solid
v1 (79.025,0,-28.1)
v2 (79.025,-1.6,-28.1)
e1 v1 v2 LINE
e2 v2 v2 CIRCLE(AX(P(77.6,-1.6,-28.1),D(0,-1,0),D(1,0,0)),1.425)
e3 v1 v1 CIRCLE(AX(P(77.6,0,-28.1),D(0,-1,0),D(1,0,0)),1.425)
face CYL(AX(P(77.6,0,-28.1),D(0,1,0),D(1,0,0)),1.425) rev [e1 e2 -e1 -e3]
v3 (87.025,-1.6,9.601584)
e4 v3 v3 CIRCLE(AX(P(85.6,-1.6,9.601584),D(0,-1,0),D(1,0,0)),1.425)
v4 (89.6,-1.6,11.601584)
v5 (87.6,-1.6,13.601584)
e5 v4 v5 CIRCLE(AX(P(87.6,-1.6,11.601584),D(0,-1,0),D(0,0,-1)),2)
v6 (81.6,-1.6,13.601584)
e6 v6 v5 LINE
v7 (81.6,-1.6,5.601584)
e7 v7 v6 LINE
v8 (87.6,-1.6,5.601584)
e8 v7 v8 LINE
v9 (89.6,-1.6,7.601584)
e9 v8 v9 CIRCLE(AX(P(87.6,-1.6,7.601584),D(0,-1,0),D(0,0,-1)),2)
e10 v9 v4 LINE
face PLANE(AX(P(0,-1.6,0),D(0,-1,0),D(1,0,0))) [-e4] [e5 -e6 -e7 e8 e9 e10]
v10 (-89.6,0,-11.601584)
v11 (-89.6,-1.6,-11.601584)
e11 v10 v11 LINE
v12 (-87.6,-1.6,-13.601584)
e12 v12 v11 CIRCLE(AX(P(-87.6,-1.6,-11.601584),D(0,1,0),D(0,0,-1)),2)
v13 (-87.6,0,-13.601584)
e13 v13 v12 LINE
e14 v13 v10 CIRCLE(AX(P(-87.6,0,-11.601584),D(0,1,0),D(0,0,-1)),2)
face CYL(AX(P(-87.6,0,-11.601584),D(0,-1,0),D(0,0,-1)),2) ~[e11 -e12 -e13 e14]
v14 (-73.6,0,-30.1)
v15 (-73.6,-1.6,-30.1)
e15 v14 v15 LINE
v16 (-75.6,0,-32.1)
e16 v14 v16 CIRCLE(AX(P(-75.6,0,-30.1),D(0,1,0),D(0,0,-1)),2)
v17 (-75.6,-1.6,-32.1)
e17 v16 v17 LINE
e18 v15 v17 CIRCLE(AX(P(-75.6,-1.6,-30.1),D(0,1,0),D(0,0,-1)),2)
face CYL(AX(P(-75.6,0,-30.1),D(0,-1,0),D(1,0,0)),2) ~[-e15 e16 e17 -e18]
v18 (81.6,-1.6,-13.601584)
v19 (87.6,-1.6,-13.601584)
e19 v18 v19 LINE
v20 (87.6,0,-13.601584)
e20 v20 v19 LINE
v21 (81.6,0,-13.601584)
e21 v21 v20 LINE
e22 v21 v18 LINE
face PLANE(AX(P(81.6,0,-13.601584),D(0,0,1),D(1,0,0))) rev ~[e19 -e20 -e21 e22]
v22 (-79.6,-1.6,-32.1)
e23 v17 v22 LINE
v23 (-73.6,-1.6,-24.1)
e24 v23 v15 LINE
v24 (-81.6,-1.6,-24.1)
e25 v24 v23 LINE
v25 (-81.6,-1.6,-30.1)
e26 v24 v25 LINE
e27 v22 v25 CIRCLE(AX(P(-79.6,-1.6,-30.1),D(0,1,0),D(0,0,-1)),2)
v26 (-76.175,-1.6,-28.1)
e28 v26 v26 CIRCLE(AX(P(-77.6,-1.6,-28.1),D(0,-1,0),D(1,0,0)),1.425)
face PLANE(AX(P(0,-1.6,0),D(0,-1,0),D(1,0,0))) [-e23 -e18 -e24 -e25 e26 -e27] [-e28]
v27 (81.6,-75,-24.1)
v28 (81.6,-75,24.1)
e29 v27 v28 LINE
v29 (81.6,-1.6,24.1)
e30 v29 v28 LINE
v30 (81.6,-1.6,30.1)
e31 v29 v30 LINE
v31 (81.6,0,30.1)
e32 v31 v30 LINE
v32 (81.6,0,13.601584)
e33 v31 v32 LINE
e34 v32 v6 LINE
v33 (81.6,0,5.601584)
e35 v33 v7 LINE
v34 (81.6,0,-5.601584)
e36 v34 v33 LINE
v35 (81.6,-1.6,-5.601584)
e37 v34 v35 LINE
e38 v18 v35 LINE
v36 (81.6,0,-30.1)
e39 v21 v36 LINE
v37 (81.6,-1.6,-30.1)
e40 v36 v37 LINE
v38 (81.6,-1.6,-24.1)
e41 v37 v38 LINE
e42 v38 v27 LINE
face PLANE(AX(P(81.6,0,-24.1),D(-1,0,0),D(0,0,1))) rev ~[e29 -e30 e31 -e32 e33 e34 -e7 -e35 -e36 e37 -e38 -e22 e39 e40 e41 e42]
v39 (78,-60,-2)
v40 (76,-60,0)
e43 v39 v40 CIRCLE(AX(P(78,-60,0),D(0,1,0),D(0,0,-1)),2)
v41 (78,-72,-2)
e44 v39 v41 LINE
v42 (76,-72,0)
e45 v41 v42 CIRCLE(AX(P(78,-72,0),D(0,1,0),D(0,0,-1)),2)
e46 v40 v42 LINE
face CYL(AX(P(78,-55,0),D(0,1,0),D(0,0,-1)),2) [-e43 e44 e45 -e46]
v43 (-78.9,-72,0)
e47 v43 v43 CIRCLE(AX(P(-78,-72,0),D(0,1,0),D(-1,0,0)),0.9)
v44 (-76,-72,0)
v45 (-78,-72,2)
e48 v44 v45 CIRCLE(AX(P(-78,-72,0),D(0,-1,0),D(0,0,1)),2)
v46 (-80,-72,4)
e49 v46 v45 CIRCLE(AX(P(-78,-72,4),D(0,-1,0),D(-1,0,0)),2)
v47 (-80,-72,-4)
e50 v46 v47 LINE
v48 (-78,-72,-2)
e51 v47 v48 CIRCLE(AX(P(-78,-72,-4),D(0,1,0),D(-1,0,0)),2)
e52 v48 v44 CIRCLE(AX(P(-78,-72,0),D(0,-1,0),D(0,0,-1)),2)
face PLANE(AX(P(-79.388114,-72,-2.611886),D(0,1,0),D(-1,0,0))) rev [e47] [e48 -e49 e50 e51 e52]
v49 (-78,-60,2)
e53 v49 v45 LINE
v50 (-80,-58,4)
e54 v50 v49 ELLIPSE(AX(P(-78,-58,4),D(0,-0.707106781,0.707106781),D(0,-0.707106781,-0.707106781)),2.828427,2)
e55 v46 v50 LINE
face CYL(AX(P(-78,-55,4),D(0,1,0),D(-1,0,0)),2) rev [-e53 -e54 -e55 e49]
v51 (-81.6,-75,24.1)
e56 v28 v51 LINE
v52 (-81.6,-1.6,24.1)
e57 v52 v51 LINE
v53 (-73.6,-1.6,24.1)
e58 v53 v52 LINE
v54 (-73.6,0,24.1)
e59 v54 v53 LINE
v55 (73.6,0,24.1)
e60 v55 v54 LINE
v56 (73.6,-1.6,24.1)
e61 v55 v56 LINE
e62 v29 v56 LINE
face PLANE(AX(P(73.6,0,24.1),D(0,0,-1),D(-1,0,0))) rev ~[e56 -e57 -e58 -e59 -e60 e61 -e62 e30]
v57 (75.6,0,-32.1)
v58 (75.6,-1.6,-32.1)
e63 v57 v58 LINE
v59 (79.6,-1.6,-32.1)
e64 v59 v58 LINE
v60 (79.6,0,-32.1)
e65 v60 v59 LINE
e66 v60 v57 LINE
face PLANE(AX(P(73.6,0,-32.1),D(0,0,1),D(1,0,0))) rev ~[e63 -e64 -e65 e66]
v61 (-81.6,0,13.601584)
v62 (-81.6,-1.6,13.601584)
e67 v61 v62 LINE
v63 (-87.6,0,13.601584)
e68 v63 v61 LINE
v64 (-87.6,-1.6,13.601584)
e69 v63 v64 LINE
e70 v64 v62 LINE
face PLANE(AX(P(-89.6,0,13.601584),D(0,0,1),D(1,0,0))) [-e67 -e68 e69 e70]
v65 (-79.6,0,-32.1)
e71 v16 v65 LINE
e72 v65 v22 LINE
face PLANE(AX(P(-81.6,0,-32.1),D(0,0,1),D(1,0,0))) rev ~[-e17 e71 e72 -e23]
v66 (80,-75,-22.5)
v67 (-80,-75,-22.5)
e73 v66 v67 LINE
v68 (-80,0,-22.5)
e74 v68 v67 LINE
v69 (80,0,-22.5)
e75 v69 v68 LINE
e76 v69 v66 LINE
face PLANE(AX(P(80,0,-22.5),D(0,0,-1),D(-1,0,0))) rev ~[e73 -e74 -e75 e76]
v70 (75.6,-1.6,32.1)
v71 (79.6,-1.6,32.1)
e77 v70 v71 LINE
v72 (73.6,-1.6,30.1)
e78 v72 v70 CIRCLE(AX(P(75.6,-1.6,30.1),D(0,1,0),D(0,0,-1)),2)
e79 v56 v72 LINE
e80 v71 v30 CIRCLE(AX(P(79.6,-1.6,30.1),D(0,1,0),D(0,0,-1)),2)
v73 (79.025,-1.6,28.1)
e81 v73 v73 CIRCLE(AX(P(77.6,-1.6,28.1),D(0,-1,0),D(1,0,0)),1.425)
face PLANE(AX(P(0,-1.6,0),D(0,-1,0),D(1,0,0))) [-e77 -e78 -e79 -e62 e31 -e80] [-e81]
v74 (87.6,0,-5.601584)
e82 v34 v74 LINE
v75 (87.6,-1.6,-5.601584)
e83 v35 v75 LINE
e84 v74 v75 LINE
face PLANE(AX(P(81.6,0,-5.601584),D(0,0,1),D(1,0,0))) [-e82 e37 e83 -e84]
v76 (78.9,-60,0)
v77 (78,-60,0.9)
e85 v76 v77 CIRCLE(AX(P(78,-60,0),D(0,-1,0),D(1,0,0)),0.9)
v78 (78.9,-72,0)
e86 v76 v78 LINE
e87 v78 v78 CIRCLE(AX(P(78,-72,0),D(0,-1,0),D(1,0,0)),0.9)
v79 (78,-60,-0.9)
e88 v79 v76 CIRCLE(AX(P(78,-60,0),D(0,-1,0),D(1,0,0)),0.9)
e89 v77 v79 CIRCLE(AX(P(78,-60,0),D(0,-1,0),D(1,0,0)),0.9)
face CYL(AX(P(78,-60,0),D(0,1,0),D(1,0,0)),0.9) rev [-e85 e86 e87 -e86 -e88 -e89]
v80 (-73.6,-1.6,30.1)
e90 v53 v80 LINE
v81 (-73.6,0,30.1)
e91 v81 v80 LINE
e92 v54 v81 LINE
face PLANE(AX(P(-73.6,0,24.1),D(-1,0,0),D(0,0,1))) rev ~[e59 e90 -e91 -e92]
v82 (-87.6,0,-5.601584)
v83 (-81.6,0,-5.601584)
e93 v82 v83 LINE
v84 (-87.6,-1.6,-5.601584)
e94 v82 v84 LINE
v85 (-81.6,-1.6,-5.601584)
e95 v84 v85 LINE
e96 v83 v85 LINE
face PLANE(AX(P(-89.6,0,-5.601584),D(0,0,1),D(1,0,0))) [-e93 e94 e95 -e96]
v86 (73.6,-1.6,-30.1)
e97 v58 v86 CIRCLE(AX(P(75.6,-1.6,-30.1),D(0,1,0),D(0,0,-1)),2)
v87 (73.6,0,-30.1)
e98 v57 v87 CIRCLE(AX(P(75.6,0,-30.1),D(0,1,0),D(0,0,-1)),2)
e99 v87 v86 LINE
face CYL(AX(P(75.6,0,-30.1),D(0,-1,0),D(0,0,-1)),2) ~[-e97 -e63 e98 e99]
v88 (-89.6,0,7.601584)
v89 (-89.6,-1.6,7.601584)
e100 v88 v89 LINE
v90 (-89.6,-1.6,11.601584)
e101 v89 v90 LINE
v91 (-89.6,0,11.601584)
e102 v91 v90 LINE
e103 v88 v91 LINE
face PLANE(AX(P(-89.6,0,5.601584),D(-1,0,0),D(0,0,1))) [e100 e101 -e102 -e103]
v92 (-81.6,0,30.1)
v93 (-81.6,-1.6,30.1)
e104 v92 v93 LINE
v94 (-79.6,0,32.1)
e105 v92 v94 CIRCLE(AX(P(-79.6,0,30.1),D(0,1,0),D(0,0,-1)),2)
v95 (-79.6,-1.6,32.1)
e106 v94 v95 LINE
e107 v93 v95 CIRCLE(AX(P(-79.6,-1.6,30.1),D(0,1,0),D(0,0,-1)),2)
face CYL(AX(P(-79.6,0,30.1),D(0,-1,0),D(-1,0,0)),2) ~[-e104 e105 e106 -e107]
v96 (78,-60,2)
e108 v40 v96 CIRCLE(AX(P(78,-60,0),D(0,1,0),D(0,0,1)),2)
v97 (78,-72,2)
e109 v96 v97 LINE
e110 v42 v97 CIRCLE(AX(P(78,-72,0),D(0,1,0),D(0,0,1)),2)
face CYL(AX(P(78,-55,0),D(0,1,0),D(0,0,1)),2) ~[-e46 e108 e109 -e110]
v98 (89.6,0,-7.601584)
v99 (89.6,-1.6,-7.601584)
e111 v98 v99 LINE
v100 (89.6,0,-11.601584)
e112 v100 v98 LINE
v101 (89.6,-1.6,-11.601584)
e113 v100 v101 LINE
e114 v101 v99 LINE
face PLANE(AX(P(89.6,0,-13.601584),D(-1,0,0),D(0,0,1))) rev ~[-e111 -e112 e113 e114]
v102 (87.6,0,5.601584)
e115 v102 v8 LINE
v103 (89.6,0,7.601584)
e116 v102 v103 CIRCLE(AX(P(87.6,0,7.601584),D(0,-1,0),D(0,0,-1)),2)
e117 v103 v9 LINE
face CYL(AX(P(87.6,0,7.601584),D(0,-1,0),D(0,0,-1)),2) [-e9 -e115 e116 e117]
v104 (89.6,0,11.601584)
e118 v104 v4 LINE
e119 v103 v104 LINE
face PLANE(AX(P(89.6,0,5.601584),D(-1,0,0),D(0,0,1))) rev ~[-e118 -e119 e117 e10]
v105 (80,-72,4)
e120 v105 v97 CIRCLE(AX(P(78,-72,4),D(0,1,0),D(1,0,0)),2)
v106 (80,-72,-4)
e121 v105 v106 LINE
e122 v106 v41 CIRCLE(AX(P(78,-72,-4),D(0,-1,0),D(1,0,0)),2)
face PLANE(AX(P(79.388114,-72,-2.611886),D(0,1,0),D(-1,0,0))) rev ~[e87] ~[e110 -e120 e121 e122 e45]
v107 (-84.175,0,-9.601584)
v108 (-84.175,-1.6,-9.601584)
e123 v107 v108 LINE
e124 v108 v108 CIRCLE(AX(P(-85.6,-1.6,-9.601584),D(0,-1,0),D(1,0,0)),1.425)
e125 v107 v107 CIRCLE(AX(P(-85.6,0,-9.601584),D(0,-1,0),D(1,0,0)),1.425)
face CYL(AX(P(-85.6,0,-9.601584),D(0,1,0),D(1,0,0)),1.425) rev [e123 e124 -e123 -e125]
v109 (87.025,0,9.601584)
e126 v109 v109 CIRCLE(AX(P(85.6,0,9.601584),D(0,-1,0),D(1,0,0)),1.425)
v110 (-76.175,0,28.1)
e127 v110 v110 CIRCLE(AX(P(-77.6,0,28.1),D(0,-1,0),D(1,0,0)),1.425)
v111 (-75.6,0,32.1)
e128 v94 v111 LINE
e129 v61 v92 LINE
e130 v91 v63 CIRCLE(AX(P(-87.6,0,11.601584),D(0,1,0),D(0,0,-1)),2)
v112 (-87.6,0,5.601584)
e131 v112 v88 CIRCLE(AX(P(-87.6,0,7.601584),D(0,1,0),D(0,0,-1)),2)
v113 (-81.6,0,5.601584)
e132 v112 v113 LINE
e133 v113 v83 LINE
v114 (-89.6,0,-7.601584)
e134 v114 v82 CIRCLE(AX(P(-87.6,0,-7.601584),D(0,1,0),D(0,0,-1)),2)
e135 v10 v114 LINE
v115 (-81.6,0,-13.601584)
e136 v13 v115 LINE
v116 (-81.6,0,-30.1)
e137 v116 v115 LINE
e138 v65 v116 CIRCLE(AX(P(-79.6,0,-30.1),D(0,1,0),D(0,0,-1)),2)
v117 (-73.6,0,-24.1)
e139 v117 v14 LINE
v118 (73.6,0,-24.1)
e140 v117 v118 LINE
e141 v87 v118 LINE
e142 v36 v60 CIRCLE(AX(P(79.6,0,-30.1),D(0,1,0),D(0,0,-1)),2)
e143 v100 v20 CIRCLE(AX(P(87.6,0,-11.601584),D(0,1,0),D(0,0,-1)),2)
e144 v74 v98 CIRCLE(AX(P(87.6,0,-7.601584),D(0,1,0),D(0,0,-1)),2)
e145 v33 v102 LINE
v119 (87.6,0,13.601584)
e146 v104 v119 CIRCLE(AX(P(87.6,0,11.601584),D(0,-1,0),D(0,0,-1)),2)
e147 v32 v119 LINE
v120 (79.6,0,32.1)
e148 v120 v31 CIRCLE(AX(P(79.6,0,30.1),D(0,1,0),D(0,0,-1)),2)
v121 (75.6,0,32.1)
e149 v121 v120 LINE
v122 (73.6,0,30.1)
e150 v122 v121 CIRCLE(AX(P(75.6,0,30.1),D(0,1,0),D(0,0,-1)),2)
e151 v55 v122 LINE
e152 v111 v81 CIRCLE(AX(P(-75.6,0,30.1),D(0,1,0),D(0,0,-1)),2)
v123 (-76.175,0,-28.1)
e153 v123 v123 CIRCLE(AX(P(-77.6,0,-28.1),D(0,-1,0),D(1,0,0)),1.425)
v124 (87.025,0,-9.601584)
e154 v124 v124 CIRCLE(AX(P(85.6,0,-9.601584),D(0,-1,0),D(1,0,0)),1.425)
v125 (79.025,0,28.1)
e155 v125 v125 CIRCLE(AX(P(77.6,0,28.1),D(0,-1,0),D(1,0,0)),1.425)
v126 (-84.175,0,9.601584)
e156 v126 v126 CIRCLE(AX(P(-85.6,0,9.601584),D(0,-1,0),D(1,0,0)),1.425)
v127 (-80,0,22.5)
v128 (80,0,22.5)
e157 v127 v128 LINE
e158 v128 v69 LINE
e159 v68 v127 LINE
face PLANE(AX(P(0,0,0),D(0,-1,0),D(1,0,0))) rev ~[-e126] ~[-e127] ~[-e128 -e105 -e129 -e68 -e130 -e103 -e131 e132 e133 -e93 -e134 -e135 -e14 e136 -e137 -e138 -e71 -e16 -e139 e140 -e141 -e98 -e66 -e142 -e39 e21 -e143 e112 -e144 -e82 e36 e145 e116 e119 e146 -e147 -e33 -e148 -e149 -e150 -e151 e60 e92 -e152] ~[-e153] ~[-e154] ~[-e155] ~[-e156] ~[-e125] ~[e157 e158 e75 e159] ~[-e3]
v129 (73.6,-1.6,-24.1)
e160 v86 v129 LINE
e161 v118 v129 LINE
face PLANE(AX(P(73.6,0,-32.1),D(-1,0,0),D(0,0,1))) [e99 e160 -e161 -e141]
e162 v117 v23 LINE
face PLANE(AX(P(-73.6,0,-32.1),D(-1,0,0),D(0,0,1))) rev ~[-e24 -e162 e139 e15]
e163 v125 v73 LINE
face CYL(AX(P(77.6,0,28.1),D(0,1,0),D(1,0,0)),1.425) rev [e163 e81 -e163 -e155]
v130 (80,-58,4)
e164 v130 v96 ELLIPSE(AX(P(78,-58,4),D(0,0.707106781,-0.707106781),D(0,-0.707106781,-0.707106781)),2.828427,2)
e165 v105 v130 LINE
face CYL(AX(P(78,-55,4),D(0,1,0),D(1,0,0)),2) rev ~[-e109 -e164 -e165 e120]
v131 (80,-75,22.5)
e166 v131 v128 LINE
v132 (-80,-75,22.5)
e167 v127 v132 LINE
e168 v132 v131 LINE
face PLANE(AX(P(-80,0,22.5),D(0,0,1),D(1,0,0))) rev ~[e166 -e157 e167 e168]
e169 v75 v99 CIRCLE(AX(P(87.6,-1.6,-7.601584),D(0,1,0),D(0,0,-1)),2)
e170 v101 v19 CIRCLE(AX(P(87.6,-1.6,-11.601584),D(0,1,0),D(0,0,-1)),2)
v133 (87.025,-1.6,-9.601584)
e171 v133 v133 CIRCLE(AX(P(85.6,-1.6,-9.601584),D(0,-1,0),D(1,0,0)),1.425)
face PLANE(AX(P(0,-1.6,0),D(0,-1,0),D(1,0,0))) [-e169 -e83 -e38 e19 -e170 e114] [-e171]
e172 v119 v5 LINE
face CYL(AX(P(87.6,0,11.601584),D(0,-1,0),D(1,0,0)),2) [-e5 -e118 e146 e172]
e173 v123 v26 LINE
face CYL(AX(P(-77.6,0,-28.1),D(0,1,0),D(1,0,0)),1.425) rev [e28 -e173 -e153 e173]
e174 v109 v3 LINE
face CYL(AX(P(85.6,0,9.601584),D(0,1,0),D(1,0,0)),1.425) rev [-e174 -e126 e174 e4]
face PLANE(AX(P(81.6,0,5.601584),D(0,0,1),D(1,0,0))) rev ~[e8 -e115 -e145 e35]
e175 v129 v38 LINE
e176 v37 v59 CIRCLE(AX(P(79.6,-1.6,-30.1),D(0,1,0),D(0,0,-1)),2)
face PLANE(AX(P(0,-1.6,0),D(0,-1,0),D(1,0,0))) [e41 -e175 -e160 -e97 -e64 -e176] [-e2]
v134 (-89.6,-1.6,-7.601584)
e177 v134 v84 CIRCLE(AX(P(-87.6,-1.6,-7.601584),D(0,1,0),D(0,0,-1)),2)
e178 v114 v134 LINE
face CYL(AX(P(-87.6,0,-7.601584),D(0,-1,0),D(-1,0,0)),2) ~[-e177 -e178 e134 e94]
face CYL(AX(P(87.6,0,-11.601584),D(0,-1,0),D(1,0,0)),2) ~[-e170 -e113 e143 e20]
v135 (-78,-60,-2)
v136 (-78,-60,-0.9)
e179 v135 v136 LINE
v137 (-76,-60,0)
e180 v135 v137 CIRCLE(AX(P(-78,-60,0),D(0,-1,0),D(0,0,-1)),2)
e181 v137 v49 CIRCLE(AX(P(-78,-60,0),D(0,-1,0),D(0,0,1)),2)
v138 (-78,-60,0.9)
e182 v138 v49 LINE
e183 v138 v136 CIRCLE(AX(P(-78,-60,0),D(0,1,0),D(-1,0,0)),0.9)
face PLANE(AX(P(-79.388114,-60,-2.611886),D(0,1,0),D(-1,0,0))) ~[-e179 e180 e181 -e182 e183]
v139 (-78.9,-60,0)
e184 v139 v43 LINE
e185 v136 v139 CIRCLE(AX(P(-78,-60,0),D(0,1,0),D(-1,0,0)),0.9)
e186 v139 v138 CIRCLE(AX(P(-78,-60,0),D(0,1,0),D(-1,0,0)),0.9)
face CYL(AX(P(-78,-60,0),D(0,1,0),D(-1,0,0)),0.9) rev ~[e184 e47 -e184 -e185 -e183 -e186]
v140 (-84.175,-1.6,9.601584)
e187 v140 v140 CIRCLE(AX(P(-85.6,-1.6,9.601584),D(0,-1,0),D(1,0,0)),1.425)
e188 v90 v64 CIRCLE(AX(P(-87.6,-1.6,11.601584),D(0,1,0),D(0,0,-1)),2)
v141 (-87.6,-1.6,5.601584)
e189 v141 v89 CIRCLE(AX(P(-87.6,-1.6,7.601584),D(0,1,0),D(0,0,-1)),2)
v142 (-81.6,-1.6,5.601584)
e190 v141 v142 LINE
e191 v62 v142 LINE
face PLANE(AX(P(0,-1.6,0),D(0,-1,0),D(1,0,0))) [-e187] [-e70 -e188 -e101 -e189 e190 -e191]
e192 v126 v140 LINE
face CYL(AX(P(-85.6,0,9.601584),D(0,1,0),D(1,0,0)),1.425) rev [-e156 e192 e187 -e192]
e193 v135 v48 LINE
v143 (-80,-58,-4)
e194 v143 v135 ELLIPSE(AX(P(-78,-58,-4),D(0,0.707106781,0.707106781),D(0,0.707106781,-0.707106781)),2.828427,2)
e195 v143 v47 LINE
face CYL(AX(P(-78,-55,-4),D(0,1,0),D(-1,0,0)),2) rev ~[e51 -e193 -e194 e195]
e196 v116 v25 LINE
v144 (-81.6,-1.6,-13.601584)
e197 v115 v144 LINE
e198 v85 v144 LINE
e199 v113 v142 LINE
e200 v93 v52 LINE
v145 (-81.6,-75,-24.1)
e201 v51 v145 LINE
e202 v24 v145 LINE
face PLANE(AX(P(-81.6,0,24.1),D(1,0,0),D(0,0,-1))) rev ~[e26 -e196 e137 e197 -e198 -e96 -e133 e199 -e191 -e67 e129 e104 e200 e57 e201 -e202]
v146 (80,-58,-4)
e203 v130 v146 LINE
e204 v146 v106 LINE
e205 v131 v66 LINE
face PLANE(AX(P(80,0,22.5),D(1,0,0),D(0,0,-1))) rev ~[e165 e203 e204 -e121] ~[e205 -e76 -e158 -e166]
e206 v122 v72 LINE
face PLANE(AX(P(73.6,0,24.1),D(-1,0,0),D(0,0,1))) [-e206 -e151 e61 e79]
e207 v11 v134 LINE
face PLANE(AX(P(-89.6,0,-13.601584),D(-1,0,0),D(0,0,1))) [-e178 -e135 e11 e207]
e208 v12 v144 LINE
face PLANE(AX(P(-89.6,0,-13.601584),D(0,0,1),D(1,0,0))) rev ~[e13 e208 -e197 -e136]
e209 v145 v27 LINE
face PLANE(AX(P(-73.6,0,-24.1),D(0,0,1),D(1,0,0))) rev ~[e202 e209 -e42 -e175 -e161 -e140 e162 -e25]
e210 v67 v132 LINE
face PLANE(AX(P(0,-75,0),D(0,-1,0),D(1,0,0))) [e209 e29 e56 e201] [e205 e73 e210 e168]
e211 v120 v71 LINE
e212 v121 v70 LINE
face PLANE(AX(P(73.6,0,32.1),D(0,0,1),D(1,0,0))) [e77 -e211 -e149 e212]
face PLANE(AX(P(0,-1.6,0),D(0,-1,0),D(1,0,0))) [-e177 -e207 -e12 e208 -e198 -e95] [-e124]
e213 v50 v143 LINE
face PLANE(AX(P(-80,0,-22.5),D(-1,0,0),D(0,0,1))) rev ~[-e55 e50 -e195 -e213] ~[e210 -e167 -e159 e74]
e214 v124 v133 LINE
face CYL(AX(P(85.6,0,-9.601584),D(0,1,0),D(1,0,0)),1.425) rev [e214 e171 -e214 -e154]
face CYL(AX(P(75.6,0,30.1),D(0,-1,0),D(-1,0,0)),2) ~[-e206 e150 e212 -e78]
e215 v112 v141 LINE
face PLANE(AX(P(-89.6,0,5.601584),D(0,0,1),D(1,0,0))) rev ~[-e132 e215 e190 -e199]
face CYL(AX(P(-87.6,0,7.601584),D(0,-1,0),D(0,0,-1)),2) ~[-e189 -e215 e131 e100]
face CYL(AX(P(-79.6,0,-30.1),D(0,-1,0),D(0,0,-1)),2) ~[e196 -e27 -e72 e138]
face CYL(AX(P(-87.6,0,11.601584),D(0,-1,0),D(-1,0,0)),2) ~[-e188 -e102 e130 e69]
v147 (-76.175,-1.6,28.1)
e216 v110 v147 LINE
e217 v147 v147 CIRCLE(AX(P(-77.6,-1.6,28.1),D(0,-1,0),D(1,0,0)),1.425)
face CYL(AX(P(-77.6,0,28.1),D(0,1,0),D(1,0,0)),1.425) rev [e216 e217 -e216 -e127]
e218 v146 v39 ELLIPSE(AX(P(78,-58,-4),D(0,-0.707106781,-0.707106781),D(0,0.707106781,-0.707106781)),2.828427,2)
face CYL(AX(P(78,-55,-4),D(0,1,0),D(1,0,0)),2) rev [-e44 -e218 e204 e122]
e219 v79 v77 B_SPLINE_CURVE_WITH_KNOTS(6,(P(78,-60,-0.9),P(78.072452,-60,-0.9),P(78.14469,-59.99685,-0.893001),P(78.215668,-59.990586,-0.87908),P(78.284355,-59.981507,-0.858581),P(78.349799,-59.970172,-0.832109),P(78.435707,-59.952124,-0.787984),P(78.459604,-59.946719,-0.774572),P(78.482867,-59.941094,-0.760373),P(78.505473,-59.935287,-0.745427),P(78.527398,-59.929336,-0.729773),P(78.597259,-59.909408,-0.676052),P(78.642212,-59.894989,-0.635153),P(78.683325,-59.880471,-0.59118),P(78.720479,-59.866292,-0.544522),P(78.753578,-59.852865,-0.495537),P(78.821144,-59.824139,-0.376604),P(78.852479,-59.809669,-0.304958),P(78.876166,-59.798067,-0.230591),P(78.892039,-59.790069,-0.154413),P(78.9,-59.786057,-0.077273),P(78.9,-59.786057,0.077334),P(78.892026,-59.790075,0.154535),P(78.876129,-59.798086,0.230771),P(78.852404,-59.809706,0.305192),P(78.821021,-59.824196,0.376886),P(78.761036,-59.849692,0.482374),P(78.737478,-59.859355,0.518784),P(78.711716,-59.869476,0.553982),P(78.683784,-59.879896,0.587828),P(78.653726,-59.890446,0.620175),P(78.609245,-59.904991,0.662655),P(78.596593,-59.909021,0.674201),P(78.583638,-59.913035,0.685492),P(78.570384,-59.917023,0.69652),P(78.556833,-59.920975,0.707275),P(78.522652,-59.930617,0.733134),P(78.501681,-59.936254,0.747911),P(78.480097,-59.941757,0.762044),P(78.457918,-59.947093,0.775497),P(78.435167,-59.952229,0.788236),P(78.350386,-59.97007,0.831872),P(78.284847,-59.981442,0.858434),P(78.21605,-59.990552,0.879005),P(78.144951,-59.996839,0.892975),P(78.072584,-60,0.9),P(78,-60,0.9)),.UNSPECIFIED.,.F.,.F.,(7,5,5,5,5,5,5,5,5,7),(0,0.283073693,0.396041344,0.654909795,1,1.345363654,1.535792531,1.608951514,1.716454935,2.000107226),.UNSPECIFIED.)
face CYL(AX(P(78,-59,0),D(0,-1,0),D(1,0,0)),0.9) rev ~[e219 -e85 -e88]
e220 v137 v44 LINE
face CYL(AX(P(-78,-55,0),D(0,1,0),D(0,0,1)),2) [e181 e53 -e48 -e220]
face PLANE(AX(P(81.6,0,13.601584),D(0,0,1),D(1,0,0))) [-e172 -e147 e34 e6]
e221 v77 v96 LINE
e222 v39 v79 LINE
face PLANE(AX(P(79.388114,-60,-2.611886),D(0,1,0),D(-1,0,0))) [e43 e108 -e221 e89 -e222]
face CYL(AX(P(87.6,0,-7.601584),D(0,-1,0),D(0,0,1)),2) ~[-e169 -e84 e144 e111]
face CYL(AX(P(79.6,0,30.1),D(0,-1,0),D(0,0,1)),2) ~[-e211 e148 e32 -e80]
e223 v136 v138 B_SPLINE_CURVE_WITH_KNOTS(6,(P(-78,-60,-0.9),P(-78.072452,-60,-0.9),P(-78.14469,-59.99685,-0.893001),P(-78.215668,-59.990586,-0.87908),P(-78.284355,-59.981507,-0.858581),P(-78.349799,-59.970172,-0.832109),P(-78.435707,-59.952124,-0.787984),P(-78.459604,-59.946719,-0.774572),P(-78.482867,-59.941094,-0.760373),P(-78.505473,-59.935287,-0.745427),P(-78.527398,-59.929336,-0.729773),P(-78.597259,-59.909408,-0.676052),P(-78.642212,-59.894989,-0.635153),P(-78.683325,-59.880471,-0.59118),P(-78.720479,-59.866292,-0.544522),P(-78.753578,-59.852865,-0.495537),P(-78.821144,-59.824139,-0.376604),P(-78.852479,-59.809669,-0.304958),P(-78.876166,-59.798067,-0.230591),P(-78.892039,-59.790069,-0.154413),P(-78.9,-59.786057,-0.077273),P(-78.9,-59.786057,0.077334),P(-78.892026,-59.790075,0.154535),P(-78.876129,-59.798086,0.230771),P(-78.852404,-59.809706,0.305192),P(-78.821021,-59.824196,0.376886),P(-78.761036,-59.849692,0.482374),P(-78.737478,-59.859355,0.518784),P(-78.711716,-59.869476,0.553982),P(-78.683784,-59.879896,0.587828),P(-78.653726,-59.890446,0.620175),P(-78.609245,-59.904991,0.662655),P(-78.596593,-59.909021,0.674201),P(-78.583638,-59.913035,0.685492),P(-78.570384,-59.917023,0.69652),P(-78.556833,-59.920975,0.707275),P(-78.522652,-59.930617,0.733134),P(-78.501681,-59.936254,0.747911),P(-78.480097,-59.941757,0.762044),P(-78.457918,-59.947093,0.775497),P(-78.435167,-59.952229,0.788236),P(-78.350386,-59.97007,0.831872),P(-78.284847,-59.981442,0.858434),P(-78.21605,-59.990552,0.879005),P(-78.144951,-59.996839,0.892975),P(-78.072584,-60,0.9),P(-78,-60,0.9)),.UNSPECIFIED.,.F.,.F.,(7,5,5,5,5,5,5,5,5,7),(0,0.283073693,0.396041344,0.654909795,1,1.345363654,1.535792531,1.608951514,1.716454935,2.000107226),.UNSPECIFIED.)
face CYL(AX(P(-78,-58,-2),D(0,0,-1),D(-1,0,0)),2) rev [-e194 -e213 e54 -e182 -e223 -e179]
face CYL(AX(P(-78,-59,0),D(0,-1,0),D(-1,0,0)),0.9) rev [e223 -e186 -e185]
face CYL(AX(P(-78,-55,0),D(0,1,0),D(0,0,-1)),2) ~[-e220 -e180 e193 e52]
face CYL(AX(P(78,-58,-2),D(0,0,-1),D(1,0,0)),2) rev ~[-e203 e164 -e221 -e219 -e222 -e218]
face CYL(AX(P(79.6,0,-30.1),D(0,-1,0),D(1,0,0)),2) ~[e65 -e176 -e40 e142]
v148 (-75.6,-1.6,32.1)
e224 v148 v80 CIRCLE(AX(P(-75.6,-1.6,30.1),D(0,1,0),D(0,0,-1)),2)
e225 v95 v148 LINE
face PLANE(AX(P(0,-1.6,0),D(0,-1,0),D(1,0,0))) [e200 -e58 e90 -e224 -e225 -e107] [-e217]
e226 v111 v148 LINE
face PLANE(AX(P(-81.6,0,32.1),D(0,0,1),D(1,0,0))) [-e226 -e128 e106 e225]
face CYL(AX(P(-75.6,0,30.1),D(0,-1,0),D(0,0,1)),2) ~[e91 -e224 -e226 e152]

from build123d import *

# Parameters (mm, degrees)
F1_DEPTH     = 75
F0_W         = 8
F0_H         = 8
F0_R         = 1.425
F2_DEPTH     = 1.6
F3_R         = 2
F5_R         = 2
F6_START     = 60
F0_W_2       = 4
F0_H_2       = 4
F0_R_2       = 0.9
F6_DEPTH     = 12
F7_T1_DEPTH  = 12
F7_T6_DEPTH  = 4
F7_S7_R      = 0.9
F7_T8_DEPTH  = 4
F7_T13_DEPTH = 9
F7_T17_DEPTH = 17
F7_T24_DEPTH = 9
F7_T28_DEPTH = 17
F7_T31_DEPTH = 22
F9_R         = 2


# Not quite as in the source:
# - a fillet or chamfer that OpenCascade refuses, or shapes differently, is made with other operations: its cross-section is extruded or revolved along the edge and cut away or added


with BuildPart() as f1:
    # F0 (on Front) → F1 (new body)
    with BuildSketch(Plane.XZ):
        Polygon((-81.6, -13.6015841149), (-81.6, -24.1), (-73.6, -24.1), (73.6, -24.1), (81.6, -24.1), (81.6, -13.6015841149), (81.6, -5.6015841149), (81.6, 5.6015841149), (81.6, 13.6015841149), (81.6, 24.1), (73.6, 24.1), (-73.6, 24.1), (-81.6, 24.1), (-81.6, 13.6015841149), (-81.6, 5.6015841149), (-81.6, -5.6015841149), align=None)
        Polygon((80, -2), (80, -22.5), (-80, -22.5), (-80, 22.5), (80, 22.5), (80, 2), align=None, mode=Mode.SUBTRACT)
    extrude(amount=F1_DEPTH)

    # F0 (on Front) → F2 (join)
    with BuildSketch(Plane.XZ):
        Polygon((-81.6, -13.6015841149), (-81.6, -24.1), (-73.6, -24.1), (73.6, -24.1), (81.6, -24.1), (81.6, -13.6015841149), (81.6, -5.6015841149), (81.6, 5.6015841149), (81.6, 13.6015841149), (81.6, 24.1), (73.6, 24.1), (-73.6, 24.1), (-81.6, 24.1), (-81.6, 13.6015841149), (-81.6, 5.6015841149), (-81.6, -5.6015841149), align=None)
        Polygon((80, -2), (80, -22.5), (-80, -22.5), (-80, 22.5), (80, 22.5), (80, 2), align=None, mode=Mode.SUBTRACT)
        with Locations((-77.6, -28.1)):
            Rectangle(F0_W, F0_H)
        with Locations((-77.6, -28.1)):
            Circle(F0_R, mode=Mode.SUBTRACT)
        with Locations((-85.6, -9.6015841149)):
            Rectangle(F0_W, F0_H)
        with Locations((-85.6, -9.6015841149)):
            Circle(F0_R, mode=Mode.SUBTRACT)
        with Locations((77.6, -28.1)):
            Rectangle(F0_W, F0_H)
        with Locations((77.6, -28.1)):
            Circle(F0_R, mode=Mode.SUBTRACT)
        with Locations((-85.6, 9.6015841149)):
            Rectangle(F0_W, F0_H)
        with Locations((-85.6, 9.6015841149)):
            Circle(F0_R, mode=Mode.SUBTRACT)
        with Locations((85.6, -9.6015841149)):
            Rectangle(F0_W, F0_H)
        with Locations((85.6, -9.6015841149)):
            Circle(F0_R, mode=Mode.SUBTRACT)
        with Locations((-77.6, 28.1)):
            Rectangle(F0_W, F0_H)
        with Locations((-77.6, 28.1)):
            Circle(F0_R, mode=Mode.SUBTRACT)
        with Locations((85.6, 9.6015841149)):
            Rectangle(F0_W, F0_H)
        with Locations((85.6, 9.6015841149)):
            Circle(F0_R, mode=Mode.SUBTRACT)
        with Locations((77.6, 28.1)):
            Rectangle(F0_W, F0_H)
        with Locations((77.6, 28.1)):
            Circle(F0_R, mode=Mode.SUBTRACT)
    extrude(amount=F2_DEPTH)

    # F3
    f3_edges = [f1.edges().sort_by_distance(p)[0] for p in [
        (-81.6, -0.8, 32.1),
        (-73.6, -0.8, 32.1),
        (73.6, -0.8, 32.1),
        (81.6, -0.8, 32.1),
        (89.6, -0.8, -5.601584),
        (89.6, -0.8, -13.601584),
        (81.6, -0.8, -32.1),
        (73.6, -0.8, -32.1),
        (-89.6, -0.8, -13.601584),
        (-89.6, -0.8, -5.601584),
        (-81.6, -0.8, -32.1),
    ]]
    fillet(f3_edges, radius=F3_R)

    # F4: F1 across plane


with BuildPart() as f1_1:
    add(f1.part)
    add(f1.part.mirror(Plane.YZ))

    # F5
    f5_edges = [f1_1.edges().sort_by_distance(p)[0] for p in [
        (-73.6, -0.8, -32.1),
        (73.6, -0.8, -32.1),
    ]]
    fillet(f5_edges, radius=F5_R)

    # F0 (on Front) → F6 (join)
    with BuildSketch(Plane.XZ.offset(F6_START)):
        with Locations((78, 0)):
            Rectangle(F0_W_2, F0_H_2)
        with Locations((78, 0)):
            Circle(F0_R_2, mode=Mode.SUBTRACT)
    extrude(amount=F6_DEPTH)

    # F7: fillet of radius 2 on 5 edges, made by hand

    # F7_s2 → F7_t1 (join)
    with BuildSketch(Plane.XZ.offset(60)):
        with BuildLine():
            ThreePointArc((80, -4), (79.4142135624, -2.5857864376), (78, -2))
            Line((78, -2), (80, -2))
            Line((80, -2), (80, -4))
        make_face()
        with BuildLine():
            ThreePointArc((80, 4), (79.4142135624, 2.5857864376), (78, 2))
            Line((78, 2), (80, 2))
            Line((80, 2), (80, 4))
        make_face()
    extrude(amount=F7_T1_DEPTH)


with BuildPart() as f7_tool4:
    # F7_s5 → F7_t6 (new body)
    with BuildSketch(Plane.XY.offset(-2)):
        with BuildLine():
            ThreePointArc((80, -58), (79.4142135624, -59.4142135624), (78, -60))
            Line((78, -60), (80, -60))
            Line((80, -60), (80, -58))
        make_face()
    extrude(amount=F7_T6_DEPTH)

    # F7_s7 → F7_t8 (cut, symmetric)
    with BuildSketch(Plane.XZ.offset(59)):
        with Locations((78, 0)):
            Circle(F7_S7_R)
    extrude(amount=F7_T8_DEPTH, both=True, mode=Mode.SUBTRACT)


with BuildPart() as f1_2:
    add(f1_1.part)

    # F7_t3: union F7_tool4
    add(f7_tool4.part)


with BuildPart() as f7_tool11:
    # F7_s12 → F7_t13 (new body)
    with BuildSketch(Plane.XY.offset(-7)):
        with BuildLine():
            ThreePointArc((80, -58), (79.4142135624, -59.4142135624), (78, -60))
            Line((78, -60), (80, -60))
            Line((80, -60), (80, -58))
        make_face()
    extrude(amount=F7_T13_DEPTH)

    split(bisect_by=Plane.XY.offset(-2), keep=Keep.BOTTOM)


with BuildPart() as f7_tool15:
    # F7_s16 → F7_t17 (new body)
    with BuildSketch(Plane.XZ.offset(55)):
        with BuildLine():
            ThreePointArc((80, -4), (79.4142135624, -2.5857864376), (78, -2))
            Line((78, -2), (80, -2))
            Line((80, -2), (80, -4))
        make_face()
    extrude(amount=F7_T17_DEPTH)

    split(bisect_by=Plane.XZ.offset(60), keep=Keep.BOTTOM)


with BuildPart() as f7_tool11_1:
    add(f7_tool11.part)

    # F7_t19: intersect F7_tool15
    add(f7_tool15.part, mode=Mode.INTERSECT)


with BuildPart() as f1_3:
    add(f1_2.part)

    # F7_t9: union F7_tool11
    add(f7_tool11_1.part)


with BuildPart() as f7_tool22:
    # F7_s23 → F7_t24 (new body)
    with BuildSketch(Plane.XY.offset(-2)):
        with BuildLine():
            ThreePointArc((80, -58), (79.4142135624, -59.4142135624), (78, -60))
            Line((78, -60), (80, -60))
            Line((80, -60), (80, -58))
        make_face()
    extrude(amount=F7_T24_DEPTH)

    split(bisect_by=Plane.XY.offset(2), keep=Keep.TOP)


with BuildPart() as f7_tool26:
    # F7_s27 → F7_t28 (new body)
    with BuildSketch(Plane.XZ.offset(55)):
        with BuildLine():
            ThreePointArc((80, 4), (79.4142135624, 2.5857864376), (78, 2))
            Line((78, 2), (80, 2))
            Line((80, 2), (80, 4))
        make_face()
    extrude(amount=F7_T28_DEPTH)

    split(bisect_by=Plane.XZ.offset(60), keep=Keep.BOTTOM)


with BuildPart() as f7_tool22_1:
    add(f7_tool22.part)

    # F7_t30: intersect F7_tool26
    add(f7_tool26.part, mode=Mode.INTERSECT)


with BuildPart() as f1_4:
    add(f1_3.part)

    # F7_t20: union F7_tool22
    add(f7_tool22_1.part)

    # F7_s32 → F7_t31 (cut)
    with BuildSketch(Plane.XZ.offset(55)):
        with BuildLine():
            ThreePointArc((78, -2), (76.5857864376, -1.4142135624), (76, 0))
            Line((76, 0), (76, -2))
            Line((76, -2), (78, -2))
        make_face()
        with BuildLine():
            ThreePointArc((78, 2), (76.5857864376, 1.4142135624), (76, 0))
            Line((76, 0), (76, 2))
            Line((76, 2), (78, 2))
        make_face()
    extrude(amount=F7_T31_DEPTH, mode=Mode.SUBTRACT)

    # F8: F1 across plane


with BuildPart() as f1_5:
    add(f1_4.part)
    add(f1_4.part.mirror(Plane.YZ))

    # F9
    f9_edges = [f1_5.edges().sort_by_distance(p)[0] for p in [
        (89.6, -0.8, 5.601584),
        (89.6, -0.8, 13.601584),
        (-89.6, -0.8, 5.601584),
        (-89.6, -0.8, 13.601584),
    ]]
    fillet(f9_edges, radius=F9_R)


solid = f1_5.part
